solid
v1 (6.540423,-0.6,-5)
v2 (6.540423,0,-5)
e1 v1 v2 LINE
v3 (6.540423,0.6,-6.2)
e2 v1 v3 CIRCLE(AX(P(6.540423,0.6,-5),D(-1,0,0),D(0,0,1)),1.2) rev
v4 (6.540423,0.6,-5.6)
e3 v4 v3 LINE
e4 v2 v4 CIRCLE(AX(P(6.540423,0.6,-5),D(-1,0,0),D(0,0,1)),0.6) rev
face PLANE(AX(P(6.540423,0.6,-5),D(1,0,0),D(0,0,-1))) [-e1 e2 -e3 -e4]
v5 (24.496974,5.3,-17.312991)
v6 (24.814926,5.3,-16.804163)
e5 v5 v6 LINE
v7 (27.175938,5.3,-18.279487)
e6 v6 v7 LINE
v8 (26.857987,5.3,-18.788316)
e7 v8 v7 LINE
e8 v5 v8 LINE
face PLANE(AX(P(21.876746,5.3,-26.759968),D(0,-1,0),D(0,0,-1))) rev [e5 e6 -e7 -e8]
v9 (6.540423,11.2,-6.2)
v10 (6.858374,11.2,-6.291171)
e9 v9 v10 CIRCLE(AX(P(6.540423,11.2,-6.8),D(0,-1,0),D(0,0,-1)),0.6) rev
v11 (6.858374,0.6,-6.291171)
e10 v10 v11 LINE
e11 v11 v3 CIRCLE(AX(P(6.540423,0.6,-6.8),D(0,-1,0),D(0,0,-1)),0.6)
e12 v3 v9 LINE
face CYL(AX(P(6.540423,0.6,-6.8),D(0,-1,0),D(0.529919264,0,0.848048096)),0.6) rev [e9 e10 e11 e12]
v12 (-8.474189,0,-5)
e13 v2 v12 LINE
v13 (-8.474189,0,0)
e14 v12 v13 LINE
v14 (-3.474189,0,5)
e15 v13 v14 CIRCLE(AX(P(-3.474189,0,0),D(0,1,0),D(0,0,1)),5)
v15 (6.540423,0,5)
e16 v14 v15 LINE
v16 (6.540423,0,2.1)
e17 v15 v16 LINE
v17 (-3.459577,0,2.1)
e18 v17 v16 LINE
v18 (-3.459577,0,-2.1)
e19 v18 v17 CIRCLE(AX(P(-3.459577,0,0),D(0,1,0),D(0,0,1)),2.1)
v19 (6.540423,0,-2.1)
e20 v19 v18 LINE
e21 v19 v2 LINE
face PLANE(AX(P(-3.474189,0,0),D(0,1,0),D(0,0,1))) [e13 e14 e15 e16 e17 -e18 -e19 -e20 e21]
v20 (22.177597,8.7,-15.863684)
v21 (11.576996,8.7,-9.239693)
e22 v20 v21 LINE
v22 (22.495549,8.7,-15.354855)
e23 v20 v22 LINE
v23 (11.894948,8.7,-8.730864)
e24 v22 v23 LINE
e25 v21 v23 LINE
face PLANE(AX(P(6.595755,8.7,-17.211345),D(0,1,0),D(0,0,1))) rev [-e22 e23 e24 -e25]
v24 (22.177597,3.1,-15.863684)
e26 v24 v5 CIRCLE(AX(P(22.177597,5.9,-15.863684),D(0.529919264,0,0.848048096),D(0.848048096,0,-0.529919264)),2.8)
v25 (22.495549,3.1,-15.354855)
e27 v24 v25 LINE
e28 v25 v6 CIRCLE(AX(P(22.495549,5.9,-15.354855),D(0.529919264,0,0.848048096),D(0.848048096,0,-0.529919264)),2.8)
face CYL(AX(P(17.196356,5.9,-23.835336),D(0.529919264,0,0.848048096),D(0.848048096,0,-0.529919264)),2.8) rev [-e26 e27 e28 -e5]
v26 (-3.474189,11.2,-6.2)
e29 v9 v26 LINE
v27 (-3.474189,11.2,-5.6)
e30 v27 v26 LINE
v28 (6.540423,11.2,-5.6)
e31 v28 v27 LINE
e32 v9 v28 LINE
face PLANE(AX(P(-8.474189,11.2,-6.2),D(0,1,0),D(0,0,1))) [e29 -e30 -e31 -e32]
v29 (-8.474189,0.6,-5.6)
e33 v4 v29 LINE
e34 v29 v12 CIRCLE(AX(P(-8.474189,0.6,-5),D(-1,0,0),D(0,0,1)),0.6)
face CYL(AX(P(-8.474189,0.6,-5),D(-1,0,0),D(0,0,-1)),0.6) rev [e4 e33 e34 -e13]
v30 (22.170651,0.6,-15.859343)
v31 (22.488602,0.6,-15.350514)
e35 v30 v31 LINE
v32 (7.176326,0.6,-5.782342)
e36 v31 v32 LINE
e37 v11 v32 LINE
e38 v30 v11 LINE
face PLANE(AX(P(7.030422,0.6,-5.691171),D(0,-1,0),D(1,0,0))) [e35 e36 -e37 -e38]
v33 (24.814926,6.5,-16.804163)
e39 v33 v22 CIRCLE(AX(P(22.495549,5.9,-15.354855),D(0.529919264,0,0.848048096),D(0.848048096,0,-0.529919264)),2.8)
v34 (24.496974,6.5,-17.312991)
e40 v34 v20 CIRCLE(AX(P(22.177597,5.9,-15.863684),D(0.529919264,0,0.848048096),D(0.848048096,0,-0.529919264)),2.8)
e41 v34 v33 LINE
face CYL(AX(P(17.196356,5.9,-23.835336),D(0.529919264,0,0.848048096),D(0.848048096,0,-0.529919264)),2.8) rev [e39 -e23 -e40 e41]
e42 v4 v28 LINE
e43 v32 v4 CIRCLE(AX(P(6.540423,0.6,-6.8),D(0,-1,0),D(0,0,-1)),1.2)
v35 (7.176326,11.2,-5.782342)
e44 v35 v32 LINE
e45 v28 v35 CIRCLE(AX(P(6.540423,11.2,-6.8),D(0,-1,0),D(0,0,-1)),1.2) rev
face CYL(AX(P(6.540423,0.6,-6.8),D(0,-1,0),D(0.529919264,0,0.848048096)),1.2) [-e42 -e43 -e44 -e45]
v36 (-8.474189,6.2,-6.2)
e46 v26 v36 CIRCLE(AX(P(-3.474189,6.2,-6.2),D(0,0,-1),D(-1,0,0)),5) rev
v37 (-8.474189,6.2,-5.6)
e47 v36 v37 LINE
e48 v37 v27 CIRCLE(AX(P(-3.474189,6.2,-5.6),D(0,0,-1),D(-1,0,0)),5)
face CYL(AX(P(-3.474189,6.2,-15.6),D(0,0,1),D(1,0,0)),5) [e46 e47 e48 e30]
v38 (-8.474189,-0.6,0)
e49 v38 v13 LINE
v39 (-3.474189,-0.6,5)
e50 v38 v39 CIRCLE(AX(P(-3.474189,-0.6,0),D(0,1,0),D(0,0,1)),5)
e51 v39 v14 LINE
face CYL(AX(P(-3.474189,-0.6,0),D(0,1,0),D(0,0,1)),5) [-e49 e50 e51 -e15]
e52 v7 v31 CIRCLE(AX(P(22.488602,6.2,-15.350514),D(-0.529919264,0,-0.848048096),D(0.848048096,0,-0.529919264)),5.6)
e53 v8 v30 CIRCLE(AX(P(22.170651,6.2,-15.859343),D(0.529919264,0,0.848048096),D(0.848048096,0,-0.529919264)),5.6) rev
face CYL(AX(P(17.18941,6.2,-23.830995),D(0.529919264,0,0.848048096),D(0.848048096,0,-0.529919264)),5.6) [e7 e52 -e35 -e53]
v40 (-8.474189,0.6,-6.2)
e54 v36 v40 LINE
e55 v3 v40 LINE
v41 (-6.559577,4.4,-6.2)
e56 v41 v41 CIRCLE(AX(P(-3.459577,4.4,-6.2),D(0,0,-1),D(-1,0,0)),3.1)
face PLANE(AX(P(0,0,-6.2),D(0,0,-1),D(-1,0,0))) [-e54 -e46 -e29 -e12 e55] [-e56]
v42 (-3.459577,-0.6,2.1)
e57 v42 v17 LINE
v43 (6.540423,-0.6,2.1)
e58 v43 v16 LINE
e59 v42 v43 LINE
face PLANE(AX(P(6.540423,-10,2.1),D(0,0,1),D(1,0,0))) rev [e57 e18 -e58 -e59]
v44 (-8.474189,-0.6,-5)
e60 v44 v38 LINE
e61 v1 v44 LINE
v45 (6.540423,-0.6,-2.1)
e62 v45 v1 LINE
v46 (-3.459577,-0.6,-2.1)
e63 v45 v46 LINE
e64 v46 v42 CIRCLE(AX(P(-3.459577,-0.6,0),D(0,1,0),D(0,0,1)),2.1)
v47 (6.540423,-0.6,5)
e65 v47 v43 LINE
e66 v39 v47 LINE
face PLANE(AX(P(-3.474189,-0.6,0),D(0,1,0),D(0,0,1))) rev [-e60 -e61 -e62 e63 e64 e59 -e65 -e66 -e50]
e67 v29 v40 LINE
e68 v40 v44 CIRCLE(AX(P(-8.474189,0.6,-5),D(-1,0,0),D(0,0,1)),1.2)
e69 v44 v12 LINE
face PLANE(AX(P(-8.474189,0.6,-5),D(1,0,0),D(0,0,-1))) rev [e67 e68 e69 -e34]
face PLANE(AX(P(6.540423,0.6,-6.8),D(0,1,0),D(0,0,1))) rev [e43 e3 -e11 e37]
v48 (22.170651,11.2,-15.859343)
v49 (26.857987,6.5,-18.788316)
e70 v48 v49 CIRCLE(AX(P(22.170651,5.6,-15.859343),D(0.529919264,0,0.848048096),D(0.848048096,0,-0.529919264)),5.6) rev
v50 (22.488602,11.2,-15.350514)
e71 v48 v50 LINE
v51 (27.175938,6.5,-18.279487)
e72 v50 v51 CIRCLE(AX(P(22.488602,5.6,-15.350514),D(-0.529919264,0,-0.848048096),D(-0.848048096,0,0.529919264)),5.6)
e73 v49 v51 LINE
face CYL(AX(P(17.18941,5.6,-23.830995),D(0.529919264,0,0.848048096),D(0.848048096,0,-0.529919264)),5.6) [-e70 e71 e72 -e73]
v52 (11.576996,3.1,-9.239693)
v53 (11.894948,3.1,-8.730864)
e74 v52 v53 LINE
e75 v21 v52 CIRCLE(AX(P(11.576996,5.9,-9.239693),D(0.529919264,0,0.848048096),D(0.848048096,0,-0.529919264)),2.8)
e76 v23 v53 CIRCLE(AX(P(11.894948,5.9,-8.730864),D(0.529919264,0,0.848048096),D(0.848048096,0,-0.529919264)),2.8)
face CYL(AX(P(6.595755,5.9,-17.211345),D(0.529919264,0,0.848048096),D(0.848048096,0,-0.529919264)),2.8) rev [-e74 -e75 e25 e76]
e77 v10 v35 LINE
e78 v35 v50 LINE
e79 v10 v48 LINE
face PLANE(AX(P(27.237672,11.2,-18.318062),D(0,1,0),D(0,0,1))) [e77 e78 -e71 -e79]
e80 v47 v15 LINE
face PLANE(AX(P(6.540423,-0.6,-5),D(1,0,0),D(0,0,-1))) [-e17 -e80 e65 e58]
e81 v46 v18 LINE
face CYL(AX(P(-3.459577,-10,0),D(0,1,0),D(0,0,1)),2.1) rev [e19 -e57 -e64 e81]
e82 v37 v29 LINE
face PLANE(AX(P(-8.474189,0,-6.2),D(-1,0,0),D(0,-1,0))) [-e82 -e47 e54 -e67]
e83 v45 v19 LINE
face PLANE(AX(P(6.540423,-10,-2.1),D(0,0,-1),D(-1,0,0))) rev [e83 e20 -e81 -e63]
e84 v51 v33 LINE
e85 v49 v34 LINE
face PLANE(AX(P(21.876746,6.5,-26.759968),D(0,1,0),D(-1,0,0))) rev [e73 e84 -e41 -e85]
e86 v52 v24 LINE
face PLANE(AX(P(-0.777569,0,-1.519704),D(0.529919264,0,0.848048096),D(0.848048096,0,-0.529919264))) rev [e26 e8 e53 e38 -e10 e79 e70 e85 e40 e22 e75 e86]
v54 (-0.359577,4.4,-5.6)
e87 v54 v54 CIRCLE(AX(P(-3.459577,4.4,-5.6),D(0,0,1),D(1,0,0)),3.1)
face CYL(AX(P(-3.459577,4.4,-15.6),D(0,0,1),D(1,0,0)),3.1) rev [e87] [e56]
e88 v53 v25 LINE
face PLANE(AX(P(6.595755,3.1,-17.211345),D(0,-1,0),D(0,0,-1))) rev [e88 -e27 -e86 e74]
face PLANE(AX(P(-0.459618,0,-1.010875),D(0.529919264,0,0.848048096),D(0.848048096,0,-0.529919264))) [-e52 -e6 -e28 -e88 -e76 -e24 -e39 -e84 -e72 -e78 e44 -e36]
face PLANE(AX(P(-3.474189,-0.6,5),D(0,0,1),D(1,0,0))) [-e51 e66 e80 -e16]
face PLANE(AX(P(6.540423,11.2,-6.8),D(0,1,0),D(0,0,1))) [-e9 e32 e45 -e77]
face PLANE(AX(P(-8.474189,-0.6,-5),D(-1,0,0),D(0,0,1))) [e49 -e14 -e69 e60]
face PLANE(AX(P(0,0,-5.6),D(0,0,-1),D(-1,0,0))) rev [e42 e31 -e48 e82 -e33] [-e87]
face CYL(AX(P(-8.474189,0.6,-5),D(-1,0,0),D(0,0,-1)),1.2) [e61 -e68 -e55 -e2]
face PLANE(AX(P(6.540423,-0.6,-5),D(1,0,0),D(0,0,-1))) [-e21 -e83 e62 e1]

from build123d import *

# Parameters (mm, degrees)
BASE_FLANGE1_DEPTH = 0.6
CUT_EXTRUDE1_DEPTH = 10
EDGE_FLANGE1_DEPTH = 15.014611851
CUT_EXTRUDE2_DEPTH = 10
SKETCH11_R         = 3.1
CUT_EXTRUDE3_DEPTH = 10
EDGE_FLANGE2_DEPTH = 10.6
CUT_EXTRUDE4_DEPTH = 10
CUT_EXTRUDE5_DEPTH = 10


# Sheet-metal steps are written as plain solids
with BuildPart() as part:
    # Sketch1 → Base-Flange1 (new body)
    with BuildSketch(Plane(origin=(0, 0, 0), x_dir=(1, 0, 0), z_dir=(0, 1, 0))):
        with BuildLine():
            Line((-8.474188988, 5), (6.540422863, 5))
            Line((6.540422863, 5), (6.540422863, -5))
            Line((6.540422863, -5), (-3.474188988, -5))
            ThreePointArc((-3.474188988, -5), (-7.009722894, -3.535533906), (-8.474188988, 0))
            Line((-8.474188988, 0), (-8.474188988, 5))
        make_face()
    extrude(amount=-BASE_FLANGE1_DEPTH)

    # Sketch6 → Cut-Extrude1 (cut)
    with BuildSketch(Plane(origin=(0, 0, 0), x_dir=(1, 0, 0), z_dir=(0, 1, 0))):
        with BuildLine():
            Line((6.540422863, -2.1), (-3.459577137, -2.1))
            ThreePointArc((-3.459577137, -2.1), (-5.559577137, 0), (-3.459577137, 2.1))
            Line((-3.459577137, 2.1), (6.540422863, 2.1))
            Line((6.540422863, 2.1), (6.540422863, -2.1))
        make_face()
    extrude(amount=-CUT_EXTRUDE1_DEPTH, mode=Mode.SUBTRACT)

    # Edge-Flange1 section (across the edge) → Edge-Flange1 (add)
    with BuildSketch(Plane(origin=(6.540422863, 0, -5.6), x_dir=(0, 0, 1), z_dir=(-1, 0, 0))):
        with BuildLine():
            Line((-0.6, 0.6), (-0.6, 11.2))
            Line((-0.6, 11.2), (0, 11.2))
            Line((0, 11.2), (0, 0.6))
            ThreePointArc((0, 0.6), (0.175735931, 0.175735931), (0.6, 0))
            Line((0.6, 0), (0.6, -0.6))
            ThreePointArc((0.6, -0.6), (-0.248528137, -0.248528137), (-0.6, 0.6))
        make_face()
    extrude(amount=EDGE_FLANGE1_DEPTH)

    # Sketch10 → Cut-Extrude2 (cut)
    with BuildSketch(Plane.XY.offset(-5.6)):
        with BuildLine():
            Line((-8.474188988, 6.2), (-8.474188988, 11.2))
            Line((-8.474188988, 11.2), (-3.474188988, 11.2))
            ThreePointArc((-3.474188988, 11.2), (-7.009722894, 9.735533906), (-8.474188988, 6.2))
        make_face()
    extrude(amount=-CUT_EXTRUDE2_DEPTH, mode=Mode.SUBTRACT)

    # Sketch11 → Cut-Extrude3 (cut)
    with BuildSketch(Plane.XY.offset(-5.6)):
        with Locations((-3.459577137, 4.4)):
            Circle(SKETCH11_R)
    extrude(amount=-CUT_EXTRUDE3_DEPTH, mode=Mode.SUBTRACT)

    # Edge-Flange2 section (across the edge) → Edge-Flange2 (add)
    with BuildSketch(Plane(origin=(6.712470095, 11.2, -6.2), x_dir=(-0.5299192642332, 0, -0.8480480961564292), z_dir=(0, -1, 0))):
        with BuildLine():
            Line((-0.6, 0.172047231), (-0.6, 23.827952769))
            Line((-0.6, 23.827952769), (0, 23.827952769))
            Line((0, 23.827952769), (0, 0.172047231))
            ThreePointArc((0, 0.172047231), (0.023242982, 0.006664818), (0.091171142, -0.145904327))
            Line((0.091171142, -0.145904327), (-0.417657715, -0.463855886))
            ThreePointArc((-0.417657715, -0.463855886), (-0.553514035, -0.158717596), (-0.6, 0.172047231))
        make_face()
    extrude(amount=EDGE_FLANGE2_DEPTH)

    # Sketch17 → Cut-Extrude4 (cut)
    with BuildSketch(Plane(origin=(-0.583351544, 0, -0.933557619), x_dir=(0.848048096156429, 0, -0.5299192642332), z_dir=(0.5299192642332001, 0, 0.8480480961564291))):
        with BuildLine():
            Line((14.714141037, 8.7), (27.214141037, 8.7))
            ThreePointArc((27.214141037, 8.7), (30.014141037, 5.9), (27.214141037, 3.1))
            Line((27.214141037, 3.1), (14.714141037, 3.1))
            ThreePointArc((14.714141037, 3.1), (11.914141037, 5.9), (14.714141037, 8.7))
        make_face()
        with BuildLine():
            Line((32.805949691, 11.2), (32.805949691, 0.6))
            Line((32.805949691, 0.6), (27.205949691, 0.6))
            ThreePointArc((27.205949691, 0.6), (31.058221748, 2.135519713), (32.797908203, 5.9))
            ThreePointArc((32.797908203, 5.9), (31.058221748, 9.664480287), (27.205949691, 11.2))
            Line((27.205949691, 11.2), (32.805949691, 11.2))
        make_face()
    extrude(amount=-CUT_EXTRUDE4_DEPTH, mode=Mode.SUBTRACT)

    # Sketch19 → Cut-Extrude5 (cut)
    with BuildSketch(Plane(origin=(-0.583351544, 0, -0.933557619), x_dir=(0.8480480961564292, 0, -0.5299192642331998), z_dir=(0.5299192642331998, 0, 0.8480480961564292))):
        with BuildLine():
            Line((32.733155133, 5.3), (29.949099903, 5.3))
            ThreePointArc((29.949099903, 5.3), (30.014141037, 5.9), (29.949099903, 6.5))
            Line((29.949099903, 6.5), (32.733155133, 6.5))
            ThreePointArc((32.733155133, 6.5), (32.809148381, 5.9), (32.733155133, 5.3))
        make_face()
    extrude(amount=-CUT_EXTRUDE5_DEPTH, mode=Mode.SUBTRACT)


solid = part.part
